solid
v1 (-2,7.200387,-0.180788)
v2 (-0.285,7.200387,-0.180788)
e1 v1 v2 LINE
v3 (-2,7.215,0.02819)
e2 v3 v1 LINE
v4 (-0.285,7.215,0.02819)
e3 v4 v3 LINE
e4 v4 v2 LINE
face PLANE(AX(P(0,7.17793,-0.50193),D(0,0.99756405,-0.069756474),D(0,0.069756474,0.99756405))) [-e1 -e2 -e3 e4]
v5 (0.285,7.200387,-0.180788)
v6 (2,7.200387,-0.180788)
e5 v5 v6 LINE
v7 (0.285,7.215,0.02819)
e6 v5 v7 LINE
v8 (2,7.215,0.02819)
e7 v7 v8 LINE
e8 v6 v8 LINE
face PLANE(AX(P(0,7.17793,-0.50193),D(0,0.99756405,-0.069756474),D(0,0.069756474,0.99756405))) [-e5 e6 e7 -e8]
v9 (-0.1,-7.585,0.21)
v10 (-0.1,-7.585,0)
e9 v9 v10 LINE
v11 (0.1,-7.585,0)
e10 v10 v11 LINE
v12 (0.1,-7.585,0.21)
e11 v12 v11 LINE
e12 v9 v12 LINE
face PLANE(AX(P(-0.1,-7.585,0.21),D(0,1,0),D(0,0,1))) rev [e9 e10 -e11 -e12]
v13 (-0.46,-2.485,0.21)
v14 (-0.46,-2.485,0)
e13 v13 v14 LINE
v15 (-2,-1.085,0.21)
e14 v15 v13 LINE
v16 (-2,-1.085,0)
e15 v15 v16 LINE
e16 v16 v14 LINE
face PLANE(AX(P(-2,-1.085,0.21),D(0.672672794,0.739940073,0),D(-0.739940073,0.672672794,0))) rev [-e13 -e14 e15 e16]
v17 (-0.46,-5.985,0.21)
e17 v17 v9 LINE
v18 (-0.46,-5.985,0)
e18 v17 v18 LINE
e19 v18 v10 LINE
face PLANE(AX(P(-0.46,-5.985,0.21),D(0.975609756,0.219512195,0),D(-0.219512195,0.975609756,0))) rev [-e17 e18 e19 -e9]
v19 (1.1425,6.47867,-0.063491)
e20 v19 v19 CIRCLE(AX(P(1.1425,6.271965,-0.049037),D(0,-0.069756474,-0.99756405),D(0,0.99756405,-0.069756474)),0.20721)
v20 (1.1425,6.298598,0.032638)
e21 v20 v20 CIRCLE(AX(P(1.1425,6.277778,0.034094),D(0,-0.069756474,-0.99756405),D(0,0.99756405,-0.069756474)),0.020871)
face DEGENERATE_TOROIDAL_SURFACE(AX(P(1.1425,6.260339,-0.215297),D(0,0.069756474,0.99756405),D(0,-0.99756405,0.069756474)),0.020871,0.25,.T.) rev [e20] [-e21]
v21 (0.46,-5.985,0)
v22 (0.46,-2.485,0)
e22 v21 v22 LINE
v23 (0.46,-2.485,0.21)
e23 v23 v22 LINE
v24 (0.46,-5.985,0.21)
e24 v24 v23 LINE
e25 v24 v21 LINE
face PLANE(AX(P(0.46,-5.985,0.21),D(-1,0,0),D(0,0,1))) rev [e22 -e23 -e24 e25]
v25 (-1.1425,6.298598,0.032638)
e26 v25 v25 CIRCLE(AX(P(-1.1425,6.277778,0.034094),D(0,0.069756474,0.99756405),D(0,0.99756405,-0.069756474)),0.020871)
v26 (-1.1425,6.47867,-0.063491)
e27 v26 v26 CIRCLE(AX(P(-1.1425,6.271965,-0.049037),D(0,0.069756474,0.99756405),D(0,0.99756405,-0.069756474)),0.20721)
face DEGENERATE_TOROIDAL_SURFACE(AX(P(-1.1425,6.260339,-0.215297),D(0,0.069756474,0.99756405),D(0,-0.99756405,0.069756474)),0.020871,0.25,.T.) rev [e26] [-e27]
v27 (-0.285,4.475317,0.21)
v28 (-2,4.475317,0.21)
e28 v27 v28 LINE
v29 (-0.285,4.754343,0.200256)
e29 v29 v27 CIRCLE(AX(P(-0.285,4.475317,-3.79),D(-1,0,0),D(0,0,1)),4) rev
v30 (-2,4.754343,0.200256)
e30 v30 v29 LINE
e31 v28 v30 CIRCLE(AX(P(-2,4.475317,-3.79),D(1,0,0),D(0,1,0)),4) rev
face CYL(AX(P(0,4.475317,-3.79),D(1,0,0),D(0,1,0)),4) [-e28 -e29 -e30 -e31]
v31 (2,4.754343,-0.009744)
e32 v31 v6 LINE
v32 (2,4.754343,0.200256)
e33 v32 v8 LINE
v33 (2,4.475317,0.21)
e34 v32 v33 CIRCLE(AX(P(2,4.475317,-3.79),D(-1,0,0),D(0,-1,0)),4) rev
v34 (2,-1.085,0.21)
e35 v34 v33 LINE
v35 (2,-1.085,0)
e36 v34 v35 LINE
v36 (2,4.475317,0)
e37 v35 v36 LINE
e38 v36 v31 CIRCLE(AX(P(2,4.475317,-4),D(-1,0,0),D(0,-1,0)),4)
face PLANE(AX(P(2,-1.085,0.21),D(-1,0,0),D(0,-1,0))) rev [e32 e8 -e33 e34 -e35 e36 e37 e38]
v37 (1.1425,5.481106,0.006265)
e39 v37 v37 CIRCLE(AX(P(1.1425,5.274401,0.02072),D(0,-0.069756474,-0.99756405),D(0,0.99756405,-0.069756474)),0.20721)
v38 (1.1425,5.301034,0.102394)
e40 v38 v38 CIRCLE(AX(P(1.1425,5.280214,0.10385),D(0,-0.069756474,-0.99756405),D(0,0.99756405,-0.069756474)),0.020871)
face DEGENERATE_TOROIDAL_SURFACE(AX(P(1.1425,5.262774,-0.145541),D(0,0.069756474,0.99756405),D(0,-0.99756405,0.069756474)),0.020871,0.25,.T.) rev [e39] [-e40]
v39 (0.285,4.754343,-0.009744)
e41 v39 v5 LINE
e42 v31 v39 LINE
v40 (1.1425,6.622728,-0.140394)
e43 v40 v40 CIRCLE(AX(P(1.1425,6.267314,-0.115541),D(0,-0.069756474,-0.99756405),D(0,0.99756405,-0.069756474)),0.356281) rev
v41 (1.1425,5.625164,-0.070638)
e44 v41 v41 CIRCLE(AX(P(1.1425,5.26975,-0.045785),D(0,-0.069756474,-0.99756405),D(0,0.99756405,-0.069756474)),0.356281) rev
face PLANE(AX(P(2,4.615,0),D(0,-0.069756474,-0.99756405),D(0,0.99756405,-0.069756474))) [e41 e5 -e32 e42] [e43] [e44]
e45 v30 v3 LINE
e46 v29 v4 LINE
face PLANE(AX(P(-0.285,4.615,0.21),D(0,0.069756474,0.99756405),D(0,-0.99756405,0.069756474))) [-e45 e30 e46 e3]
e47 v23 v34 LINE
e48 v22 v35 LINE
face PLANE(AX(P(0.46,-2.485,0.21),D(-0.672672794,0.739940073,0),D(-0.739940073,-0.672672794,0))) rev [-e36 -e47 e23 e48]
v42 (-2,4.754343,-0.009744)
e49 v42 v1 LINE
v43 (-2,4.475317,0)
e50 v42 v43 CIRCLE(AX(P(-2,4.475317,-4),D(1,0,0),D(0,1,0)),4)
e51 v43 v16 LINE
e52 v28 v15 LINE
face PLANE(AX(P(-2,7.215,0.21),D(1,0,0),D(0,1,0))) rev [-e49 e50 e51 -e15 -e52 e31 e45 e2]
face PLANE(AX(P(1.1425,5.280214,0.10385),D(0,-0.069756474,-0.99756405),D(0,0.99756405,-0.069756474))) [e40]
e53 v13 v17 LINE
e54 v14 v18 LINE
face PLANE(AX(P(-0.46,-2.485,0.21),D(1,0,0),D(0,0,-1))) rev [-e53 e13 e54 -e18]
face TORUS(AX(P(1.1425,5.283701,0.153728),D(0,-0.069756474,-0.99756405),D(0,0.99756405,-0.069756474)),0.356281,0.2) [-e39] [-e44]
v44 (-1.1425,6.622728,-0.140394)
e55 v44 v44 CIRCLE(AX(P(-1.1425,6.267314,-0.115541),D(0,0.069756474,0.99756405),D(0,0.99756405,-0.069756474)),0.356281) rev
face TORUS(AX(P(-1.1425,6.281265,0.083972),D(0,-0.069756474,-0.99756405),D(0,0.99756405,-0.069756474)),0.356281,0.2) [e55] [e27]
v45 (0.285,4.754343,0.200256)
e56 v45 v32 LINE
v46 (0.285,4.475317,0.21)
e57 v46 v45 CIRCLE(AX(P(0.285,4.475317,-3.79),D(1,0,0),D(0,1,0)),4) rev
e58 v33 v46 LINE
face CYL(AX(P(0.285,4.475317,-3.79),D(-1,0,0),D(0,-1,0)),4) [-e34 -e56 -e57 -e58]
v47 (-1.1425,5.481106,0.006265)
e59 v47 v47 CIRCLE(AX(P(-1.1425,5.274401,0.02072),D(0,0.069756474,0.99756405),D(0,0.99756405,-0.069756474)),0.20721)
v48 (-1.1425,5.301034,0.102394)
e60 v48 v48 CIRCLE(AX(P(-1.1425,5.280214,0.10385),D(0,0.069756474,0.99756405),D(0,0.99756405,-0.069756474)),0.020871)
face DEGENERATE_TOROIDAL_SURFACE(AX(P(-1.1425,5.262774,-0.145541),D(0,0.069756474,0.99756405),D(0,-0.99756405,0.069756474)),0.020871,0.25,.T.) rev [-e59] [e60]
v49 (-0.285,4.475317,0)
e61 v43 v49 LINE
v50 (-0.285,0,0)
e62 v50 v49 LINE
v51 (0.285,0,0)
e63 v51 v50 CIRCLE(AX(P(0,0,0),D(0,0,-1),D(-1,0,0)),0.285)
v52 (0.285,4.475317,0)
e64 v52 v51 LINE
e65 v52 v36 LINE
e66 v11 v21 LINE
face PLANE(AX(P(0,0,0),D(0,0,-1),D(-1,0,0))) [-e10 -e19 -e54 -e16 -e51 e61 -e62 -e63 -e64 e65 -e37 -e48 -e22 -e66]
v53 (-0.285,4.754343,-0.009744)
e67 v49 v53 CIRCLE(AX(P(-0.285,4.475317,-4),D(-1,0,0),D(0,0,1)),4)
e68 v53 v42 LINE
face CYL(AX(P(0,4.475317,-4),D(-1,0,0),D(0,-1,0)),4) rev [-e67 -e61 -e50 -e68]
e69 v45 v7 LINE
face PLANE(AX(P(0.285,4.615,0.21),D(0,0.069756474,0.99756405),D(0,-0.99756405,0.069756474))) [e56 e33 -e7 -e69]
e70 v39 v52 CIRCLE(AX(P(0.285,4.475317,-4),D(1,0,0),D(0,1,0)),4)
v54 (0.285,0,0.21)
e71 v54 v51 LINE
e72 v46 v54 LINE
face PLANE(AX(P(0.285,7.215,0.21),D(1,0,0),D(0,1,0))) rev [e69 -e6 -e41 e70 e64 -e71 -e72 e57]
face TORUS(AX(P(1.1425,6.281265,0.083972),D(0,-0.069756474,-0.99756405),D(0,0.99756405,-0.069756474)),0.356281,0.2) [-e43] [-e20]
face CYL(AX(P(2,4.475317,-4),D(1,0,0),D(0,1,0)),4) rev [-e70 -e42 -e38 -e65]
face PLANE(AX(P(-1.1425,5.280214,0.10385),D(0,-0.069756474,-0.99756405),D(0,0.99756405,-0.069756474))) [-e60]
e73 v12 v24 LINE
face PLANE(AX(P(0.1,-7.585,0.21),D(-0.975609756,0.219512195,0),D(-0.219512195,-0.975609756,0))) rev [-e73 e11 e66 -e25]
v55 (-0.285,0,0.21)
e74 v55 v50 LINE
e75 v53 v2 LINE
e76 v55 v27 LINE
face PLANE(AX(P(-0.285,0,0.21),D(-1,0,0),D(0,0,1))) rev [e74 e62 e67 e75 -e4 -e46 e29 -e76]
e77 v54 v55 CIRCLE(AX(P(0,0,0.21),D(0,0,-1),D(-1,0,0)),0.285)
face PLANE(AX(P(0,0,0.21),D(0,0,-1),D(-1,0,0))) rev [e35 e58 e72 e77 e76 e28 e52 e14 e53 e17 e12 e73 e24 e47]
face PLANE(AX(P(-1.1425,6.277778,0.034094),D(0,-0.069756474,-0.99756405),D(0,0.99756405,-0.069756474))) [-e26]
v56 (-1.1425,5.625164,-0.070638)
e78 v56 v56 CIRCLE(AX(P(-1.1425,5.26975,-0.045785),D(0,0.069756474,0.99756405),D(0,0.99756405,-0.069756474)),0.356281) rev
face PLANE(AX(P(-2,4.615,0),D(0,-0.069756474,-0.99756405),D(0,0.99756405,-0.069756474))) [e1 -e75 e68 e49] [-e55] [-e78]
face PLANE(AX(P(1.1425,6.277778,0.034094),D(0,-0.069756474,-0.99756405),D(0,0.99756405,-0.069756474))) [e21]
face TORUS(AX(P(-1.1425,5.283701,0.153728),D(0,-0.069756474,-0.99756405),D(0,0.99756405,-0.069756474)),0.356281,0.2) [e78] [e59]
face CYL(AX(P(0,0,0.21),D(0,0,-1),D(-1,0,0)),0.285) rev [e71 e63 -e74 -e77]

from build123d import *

# Parameters (mm, degrees)
BOSS_EXTRUDE1_DEPTH  = 0.21
SKETCH2_W            = 4
SKETCH2_H            = 0.21
CUT_EXTRUDE1_DEPTH   = 2.6
SWEEP1_START         = 0.285
SWEEP1_DEPTH         = 1.715
FILLET1_START        = -3
FILLET1_DEPTH        = 6
FILLET1_START_2      = -2
FILLET1_2_DEPTH      = 1.715
FILLET1_START_3      = 0.285
FILLET1_3_DEPTH      = 1.715
SKETCH4_R            = 0.25
CUT_EXTRUDE2_DEPTH   = 0.15
FILLET2_R            = 0.25
FILLET3_R            = 0.2
FILLET2_OF_MIRROR4_R = 0.25
FILLET3_OF_MIRROR4_R = 0.2
SKETCH6_W            = 4
SKETCH6_H            = 0.209488451
CUT_EXTRUDE5_DEPTH   = 15.914789915


with BuildPart() as part:
    # Sketch1 → Boss-Extrude1 (new body)
    with BuildSketch(Plane.XY):
        with BuildLine():
            Line((-0.285, 7.215), (-2, 7.215))
            Line((-2, 7.215), (-2, -1.085))
            Line((-2, -1.085), (-0.46, -2.485))
            Line((-0.46, -2.485), (-0.46, -5.985))
            Line((-0.46, -5.985), (-0.1, -7.585))
            Line((-0.1, -7.585), (0.1, -7.585))
            Line((0.1, -7.585), (0.46, -5.985))
            Line((0.46, -5.985), (0.46, -2.485))
            Line((0.46, -2.485), (2, -1.085))
            Line((2, -1.085), (2, 7.215))
            Line((2, 7.215), (0.285, 7.215))
            Line((0.285, 7.215), (0.285, 0))
            ThreePointArc((0.285, 0), (0, -0.285), (-0.285, 0))
            Line((-0.285, 0), (-0.285, 7.215))
        make_face()
    extrude(amount=BOSS_EXTRUDE1_DEPTH)

    # Sketch2 → Cut-Extrude1 (cut)
    with BuildSketch(Plane(origin=(0, 7.215, 0), x_dir=(1, 0, 0), z_dir=(0, 1, 0))):
        with Locations((0, -0.105)):
            Rectangle(SKETCH2_W, SKETCH2_H)
    extrude(amount=-CUT_EXTRUDE1_DEPTH, mode=Mode.SUBTRACT)

    # Sweep1: read off the stored shape, not the designer's step
    # Sweep1 outline → Sweep1 (add)
    with BuildSketch(Plane.YZ.offset(SWEEP1_START)):
        Polygon((4.615, 0), (7.215, -0.181809711), (7.215, 0.028190289), (4.615, 0.21), align=None)
    extrude(amount=SWEEP1_DEPTH)

    # Mirror3: part across plane


with BuildPart() as part_1:
    add(part.part)
    add(part.part.mirror(Plane(origin=(0, 0, 0), x_dir=(0, 0, 1), z_dir=(1, 0, 0))))

    # Fillet1: read off the stored shape, not the designer's step
    # Fillet1 outline → Fillet1 (cut)
    with BuildSketch(Plane.YZ.offset(FILLET1_START)):
        with BuildLine():
            ThreePointArc((4.475316922, 0.21), (4.614914909, 0.207563308), (4.754342817, 0.200256201))
            Line((4.754342817, 0.200256201), (4.615, 0.21))
            Line((4.615, 0.21), (4.475316922, 0.21))
        make_face()
    extrude(amount=FILLET1_DEPTH, mode=Mode.SUBTRACT)

    # Fillet1 2 outline → Fillet1 2 (add)
    with BuildSketch(Plane.YZ.offset(FILLET1_START_2)):
        with BuildLine():
            Line((4.615, 0), (4.475316922, 0))
            ThreePointArc((4.475316922, 0), (4.614914909, -0.002436692), (4.754342817, -0.009743799))
            Line((4.754342817, -0.009743799), (4.615, 0))
        make_face()
    extrude(amount=FILLET1_2_DEPTH)

    # Fillet1 3 outline → Fillet1 3 (add)
    with BuildSketch(Plane.YZ.offset(FILLET1_START_3)):
        with BuildLine():
            Line((4.615, 0), (4.475316922, 0))
            ThreePointArc((4.475316922, 0), (4.614914909, -0.002436692), (4.754342817, -0.009743799))
            Line((4.754342817, -0.009743799), (4.615, 0))
        make_face()
    extrude(amount=FILLET1_3_DEPTH)

    # Sketch4 → Cut-Extrude2 (cut)
    with BuildSketch(Plane(origin=(0, 0.022456431, 0.32114193), x_dir=(-1, 0, 0), z_dir=(0, -0.06975647374412543, -0.9975640502598243))):
        with Locations(Location((-1.1425, 6.260107027, 0), (0, 0, 90))):
            Circle(SKETCH4_R)
        with Locations(Location((-1.1425, 5.260107027, 0), (0, 0, 90))):
            Circle(SKETCH4_R)
    cut_extrude2 = extrude(amount=-CUT_EXTRUDE2_DEPTH, mode=Mode.SUBTRACT)

    # Fillet2
    # the kernel refuses this fillet: 0.25 mm, written as the material it adds along each edge
    with BuildSketch(Plane(origin=(1.1425, 6.277777623, 0.034093547), x_dir=(0, 0.9975640502598242, -0.06975647374412533), z_dir=(-1, 0, 0))) as fillet2_piece_1:
        with BuildLine():
            CenterArc((0.020871215, 0.25), FILLET2_R, 270, 66.421821522)
            Line((0.020871215, 0), (0.020871215, -0.005))
            Line((0.020871215, -0.005), (0.25, -0.005))
            Line((0.25, -0.005), (0.255, 0))
            ThreePointArc((0.255, 0), (0.255, 0.075), (0.254582576, 0.148))
            Line((0.254582576, 0.148), (0.25, 0.15))
        make_face()
    revolve(axis=Axis((1.1425, 6.277777623, 0.034093547), (0, -0.06975647374412543, -0.9975640502598243)))
    with BuildSketch(Plane(origin=(1.1425, 5.280213573, 0.10385002), x_dir=(0, 0.9975640502598242, -0.06975647374412533), z_dir=(-1, 0, 0))) as fillet2_piece_2:
        with BuildLine():
            CenterArc((0.020871215, 0.25), FILLET2_R, 270, 66.421821522)
            Line((0.020871215, 0), (0.020871215, -0.005))
            Line((0.020871215, -0.005), (0.25, -0.005))
            Line((0.25, -0.005), (0.255, 0))
            ThreePointArc((0.255, 0), (0.255, 0.075), (0.254582576, 0.148))
            Line((0.254582576, 0.148), (0.25, 0.15))
        make_face()
    revolve(axis=Axis((1.1425, 5.280213573, 0.10385002), (0, -0.06975647374412543, -0.9975640502598243)))

    # Fillet3
    fillet3_edges = [part_1.edges().sort_by_distance(p)[0] for p in [
        (1.1425, 6.01792314, -0.098101943),
        (1.1425, 5.020359089, -0.028345469),
    ]]
    fillet(fillet3_edges, radius=FILLET3_R)

    # Mirror4: Cut-Extrude2 across plane
    add(cut_extrude2.mirror(Plane(origin=(0, 0, 0), x_dir=(0, 0, 1), z_dir=(1, 0, 0))), mode=Mode.SUBTRACT)

    # Fillet2 of Mirror4
    # the kernel refuses this fillet: 0.25 mm, written as the material it adds along each edge
    with BuildSketch(Plane(origin=(-1.1425, 6.277777623, 0.034093547), x_dir=(0, 0.9975640502598242, -0.06975647374412533), z_dir=(1, 0, 0))) as fillet2_of_mirror4_piece_1:
        with BuildLine():
            CenterArc((0.020871215, -0.25), FILLET2_OF_MIRROR4_R, 23.578178478, 66.421821522)
            Line((0.020871215, 0), (0.020871215, 0.005))
            Line((0.020871215, 0.005), (0.25, 0.005))
            Line((0.25, 0.005), (0.255, 0))
            ThreePointArc((0.255, 0), (0.255, -0.075), (0.254582576, -0.148))
            Line((0.254582576, -0.148), (0.25, -0.15))
        make_face()
    revolve(axis=Axis((-1.1425, 6.277777623, 0.034093547), (0, 0.06975647374412543, 0.9975640502598243)))
    with BuildSketch(Plane(origin=(-1.1425, 5.280213573, 0.10385002), x_dir=(0, 0.9975640502598242, -0.06975647374412533), z_dir=(1, 0, 0))) as fillet2_of_mirror4_piece_2:
        with BuildLine():
            CenterArc((0.020871215, -0.25), FILLET2_OF_MIRROR4_R, 23.578178478, 66.421821522)
            Line((0.020871215, 0), (0.020871215, 0.005))
            Line((0.020871215, 0.005), (0.25, 0.005))
            Line((0.25, 0.005), (0.255, 0))
            ThreePointArc((0.255, 0), (0.255, -0.075), (0.254582576, -0.148))
            Line((0.254582576, -0.148), (0.25, -0.15))
        make_face()
    revolve(axis=Axis((-1.1425, 5.280213573, 0.10385002), (0, 0.06975647374412543, 0.9975640502598243)))

    # Fillet3 of Mirror4
    fillet3_of_mirror4_edges = [part_1.edges().sort_by_distance(p)[0] for p in [
        (-1.1425, 6.01792314, -0.098101943),
        (-1.1425, 5.020359089, -0.028345469),
    ]]
    fillet(fillet3_of_mirror4_edges, radius=FILLET3_OF_MIRROR4_R)

    # Sketch6 → Cut-Extrude5 (cut, through all)
    with BuildSketch(Plane(origin=(0, 7.177930393, -0.501929789), x_dir=(1, 0, 0), z_dir=(-1.513554906801369e-15, -0.9975640502598243, 0.06975647374412539))):
        with Locations((0, 0.426670352)):
            Rectangle(SKETCH6_W, SKETCH6_H)
    extrude(amount=-CUT_EXTRUDE5_DEPTH, mode=Mode.SUBTRACT)


solid = part_1.part
